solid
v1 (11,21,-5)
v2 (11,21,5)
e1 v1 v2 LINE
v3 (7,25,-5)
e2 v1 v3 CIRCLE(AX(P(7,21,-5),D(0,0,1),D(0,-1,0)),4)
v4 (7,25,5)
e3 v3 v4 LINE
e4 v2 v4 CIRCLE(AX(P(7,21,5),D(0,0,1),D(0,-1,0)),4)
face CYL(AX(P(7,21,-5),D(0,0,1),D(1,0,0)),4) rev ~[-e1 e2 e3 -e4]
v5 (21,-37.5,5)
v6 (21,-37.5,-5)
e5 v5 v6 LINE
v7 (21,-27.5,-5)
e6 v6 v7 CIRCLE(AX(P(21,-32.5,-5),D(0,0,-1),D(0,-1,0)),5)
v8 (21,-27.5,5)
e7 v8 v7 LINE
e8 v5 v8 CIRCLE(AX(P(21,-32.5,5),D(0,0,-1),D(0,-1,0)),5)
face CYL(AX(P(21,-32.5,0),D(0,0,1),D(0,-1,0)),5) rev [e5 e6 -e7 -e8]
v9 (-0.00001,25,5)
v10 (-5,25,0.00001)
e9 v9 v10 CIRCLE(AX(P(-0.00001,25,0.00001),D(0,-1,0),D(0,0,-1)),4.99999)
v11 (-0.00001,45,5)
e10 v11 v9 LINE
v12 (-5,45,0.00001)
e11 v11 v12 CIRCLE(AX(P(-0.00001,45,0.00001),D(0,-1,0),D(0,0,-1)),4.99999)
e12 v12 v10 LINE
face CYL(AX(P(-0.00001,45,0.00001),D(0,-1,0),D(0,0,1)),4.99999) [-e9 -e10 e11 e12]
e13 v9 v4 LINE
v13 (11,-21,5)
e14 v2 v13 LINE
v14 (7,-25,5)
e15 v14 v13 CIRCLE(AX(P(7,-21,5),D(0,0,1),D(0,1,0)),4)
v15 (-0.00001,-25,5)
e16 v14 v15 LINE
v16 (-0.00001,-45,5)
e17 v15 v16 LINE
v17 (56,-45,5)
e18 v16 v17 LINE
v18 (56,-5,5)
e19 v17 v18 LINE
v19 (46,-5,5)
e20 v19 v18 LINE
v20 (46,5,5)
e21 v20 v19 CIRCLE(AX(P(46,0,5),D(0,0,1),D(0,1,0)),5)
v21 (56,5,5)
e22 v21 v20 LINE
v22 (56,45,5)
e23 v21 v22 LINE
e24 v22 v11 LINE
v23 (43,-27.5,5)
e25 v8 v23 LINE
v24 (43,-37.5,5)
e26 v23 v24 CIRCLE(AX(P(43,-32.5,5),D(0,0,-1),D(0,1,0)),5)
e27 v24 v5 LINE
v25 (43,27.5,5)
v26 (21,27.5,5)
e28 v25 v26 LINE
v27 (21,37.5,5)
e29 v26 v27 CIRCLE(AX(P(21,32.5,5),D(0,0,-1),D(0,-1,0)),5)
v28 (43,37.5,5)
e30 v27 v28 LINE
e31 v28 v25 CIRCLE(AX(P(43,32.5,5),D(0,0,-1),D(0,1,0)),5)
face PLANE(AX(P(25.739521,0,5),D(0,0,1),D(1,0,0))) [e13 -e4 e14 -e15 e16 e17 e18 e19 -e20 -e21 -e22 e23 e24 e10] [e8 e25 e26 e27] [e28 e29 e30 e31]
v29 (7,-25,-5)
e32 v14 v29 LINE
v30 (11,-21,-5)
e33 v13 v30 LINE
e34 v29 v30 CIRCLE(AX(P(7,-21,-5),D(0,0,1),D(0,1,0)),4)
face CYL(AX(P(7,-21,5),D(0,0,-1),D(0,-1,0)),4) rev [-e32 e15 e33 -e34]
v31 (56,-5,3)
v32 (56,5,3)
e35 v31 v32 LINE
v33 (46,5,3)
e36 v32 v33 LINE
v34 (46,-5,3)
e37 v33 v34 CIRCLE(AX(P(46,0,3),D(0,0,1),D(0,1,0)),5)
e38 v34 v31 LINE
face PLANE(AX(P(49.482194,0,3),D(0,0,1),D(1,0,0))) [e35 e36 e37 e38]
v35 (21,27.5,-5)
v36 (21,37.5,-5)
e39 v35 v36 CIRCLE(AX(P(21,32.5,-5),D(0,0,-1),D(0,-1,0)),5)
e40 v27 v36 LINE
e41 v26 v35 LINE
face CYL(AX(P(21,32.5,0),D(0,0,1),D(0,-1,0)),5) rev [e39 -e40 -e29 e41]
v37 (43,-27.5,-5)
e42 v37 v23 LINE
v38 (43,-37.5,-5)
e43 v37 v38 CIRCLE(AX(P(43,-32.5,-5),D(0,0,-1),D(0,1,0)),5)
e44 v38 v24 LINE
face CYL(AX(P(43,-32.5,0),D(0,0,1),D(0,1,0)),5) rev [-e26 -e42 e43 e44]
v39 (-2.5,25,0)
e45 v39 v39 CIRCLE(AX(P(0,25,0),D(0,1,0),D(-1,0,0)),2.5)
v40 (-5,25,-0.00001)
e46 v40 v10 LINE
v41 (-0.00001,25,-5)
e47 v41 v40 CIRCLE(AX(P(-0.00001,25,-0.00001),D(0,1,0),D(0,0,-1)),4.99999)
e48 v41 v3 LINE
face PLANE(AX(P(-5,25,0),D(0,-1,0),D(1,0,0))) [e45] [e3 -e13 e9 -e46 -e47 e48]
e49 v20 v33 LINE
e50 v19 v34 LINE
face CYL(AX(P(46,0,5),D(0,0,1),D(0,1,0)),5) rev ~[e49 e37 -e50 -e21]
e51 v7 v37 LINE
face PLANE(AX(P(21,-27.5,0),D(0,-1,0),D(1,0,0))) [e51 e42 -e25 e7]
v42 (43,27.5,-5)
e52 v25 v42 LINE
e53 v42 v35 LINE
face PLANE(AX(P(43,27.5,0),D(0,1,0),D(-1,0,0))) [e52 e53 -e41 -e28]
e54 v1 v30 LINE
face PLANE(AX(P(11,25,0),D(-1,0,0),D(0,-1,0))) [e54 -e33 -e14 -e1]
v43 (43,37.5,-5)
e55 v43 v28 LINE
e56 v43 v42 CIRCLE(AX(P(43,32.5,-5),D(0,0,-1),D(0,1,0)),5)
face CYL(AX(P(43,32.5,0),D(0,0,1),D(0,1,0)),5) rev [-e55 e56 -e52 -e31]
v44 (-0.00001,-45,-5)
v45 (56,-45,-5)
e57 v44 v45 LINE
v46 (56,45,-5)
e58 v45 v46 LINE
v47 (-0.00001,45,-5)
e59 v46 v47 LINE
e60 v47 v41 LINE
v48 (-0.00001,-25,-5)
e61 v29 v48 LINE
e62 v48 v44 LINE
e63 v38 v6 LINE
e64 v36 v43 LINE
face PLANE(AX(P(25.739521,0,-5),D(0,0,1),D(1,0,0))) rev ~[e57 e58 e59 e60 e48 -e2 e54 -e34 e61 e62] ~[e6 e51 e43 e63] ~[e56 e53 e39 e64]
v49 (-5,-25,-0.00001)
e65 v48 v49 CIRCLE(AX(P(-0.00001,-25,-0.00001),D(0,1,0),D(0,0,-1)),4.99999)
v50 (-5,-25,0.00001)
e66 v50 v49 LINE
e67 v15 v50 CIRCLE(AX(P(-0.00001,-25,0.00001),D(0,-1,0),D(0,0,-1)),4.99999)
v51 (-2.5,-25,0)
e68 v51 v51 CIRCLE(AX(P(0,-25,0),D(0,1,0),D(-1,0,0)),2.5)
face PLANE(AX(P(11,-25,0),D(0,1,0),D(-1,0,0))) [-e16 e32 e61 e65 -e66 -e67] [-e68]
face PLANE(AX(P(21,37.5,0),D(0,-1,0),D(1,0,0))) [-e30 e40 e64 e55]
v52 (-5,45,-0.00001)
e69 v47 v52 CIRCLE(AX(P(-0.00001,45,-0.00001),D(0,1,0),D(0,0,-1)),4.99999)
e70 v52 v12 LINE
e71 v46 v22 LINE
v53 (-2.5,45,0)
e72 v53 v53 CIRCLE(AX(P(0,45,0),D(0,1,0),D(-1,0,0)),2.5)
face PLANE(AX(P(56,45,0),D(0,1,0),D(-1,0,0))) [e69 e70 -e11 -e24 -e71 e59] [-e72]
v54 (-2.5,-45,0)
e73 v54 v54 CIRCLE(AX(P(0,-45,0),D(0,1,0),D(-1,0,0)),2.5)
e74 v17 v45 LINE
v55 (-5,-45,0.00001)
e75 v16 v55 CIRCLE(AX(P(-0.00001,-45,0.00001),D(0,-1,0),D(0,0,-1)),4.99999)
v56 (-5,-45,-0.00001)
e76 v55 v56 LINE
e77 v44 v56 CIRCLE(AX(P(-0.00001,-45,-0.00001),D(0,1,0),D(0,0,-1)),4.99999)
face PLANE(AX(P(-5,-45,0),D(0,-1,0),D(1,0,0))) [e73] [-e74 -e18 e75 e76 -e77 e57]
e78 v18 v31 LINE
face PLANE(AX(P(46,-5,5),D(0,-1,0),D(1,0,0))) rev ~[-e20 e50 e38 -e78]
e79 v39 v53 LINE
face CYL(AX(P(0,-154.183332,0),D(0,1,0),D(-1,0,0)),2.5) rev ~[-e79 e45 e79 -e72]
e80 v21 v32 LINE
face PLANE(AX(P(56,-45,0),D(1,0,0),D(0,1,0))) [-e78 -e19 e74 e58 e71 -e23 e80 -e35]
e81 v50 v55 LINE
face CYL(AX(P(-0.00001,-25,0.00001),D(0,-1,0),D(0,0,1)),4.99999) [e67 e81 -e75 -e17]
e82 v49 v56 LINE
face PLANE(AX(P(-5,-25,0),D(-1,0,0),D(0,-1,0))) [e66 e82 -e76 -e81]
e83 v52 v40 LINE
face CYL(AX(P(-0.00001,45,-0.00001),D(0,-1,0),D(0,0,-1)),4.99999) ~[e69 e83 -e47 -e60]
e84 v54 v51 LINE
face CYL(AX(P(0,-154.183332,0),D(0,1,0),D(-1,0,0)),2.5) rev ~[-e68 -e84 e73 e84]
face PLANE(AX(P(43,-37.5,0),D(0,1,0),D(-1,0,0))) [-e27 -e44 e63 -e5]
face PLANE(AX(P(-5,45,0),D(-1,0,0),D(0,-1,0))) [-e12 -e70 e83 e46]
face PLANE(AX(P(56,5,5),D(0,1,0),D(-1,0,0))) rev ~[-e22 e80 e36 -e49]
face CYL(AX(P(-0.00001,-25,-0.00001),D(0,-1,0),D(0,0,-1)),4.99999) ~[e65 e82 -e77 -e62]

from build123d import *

# Parameters (mm, degrees)
F1_DEPTH = 5
F3_D     = 5
F4_R     = 4.99999
F5_R     = 4
F7_DEPTH = 2


# Not quite as in the source:
# - a fillet or chamfer is up to 0.001 mm smaller than in the source, because OpenCascade refuses the exact size
# - a feature names something its author has since deleted; it is built from what else it names


with BuildPart() as f1:
    # F0 (on Top) → F1 (new body, symmetric)
    with BuildSketch(Plane.XY):
        Polygon((13, -45), (56, -45), (56, 45), (13, 45), (-5, 45), (-5, 25), (11, 25), (11, -25), (-5, -25), (-5, -45), align=None)
        with BuildLine():
            ThreePointArc((43, -27.5), (48, -32.5), (43, -37.5))
            Line((43, -37.5), (21, -37.5))
            ThreePointArc((21, -37.5), (16, -32.5), (21, -27.5))
            Line((21, -27.5), (43, -27.5))
        make_face(mode=Mode.SUBTRACT)
        with BuildLine():
            ThreePointArc((43, 37.5), (48, 32.5), (43, 27.5))
            Line((43, 27.5), (21, 27.5))
            ThreePointArc((21, 27.5), (16, 32.5), (21, 37.5))
            Line((21, 37.5), (43, 37.5))
        make_face(mode=Mode.SUBTRACT)
    extrude(amount=F1_DEPTH, both=True)

    # F3 (through all)
    with Locations(Plane.XZ.offset(45)):
        with Locations((0, 0)):
            Hole(F3_D / 2)

    # F4 (radius 5 in the source; OpenCascade refuses exactly that, so slightly less here)
    f4_edges = [f1.edges().sort_by_distance(p)[0] for p in [
        (-5, -35, 5),
        (-5, -35, -5),
        (-5, 35, 5),
        (-5, 35, -5),
    ]]
    fillet(f4_edges, radius=F4_R)

    # F5
    f5_edges = [f1.edges().sort_by_distance(p)[0] for p in [
        (11, 25, 0),
        (11, -25, 0),
    ]]
    fillet(f5_edges, radius=F5_R)

    # F6 (on face) → F7 (cut)
    with BuildSketch(Plane.XY.offset(5)):
        with BuildLine():
            ThreePointArc((46, 5), (41, 0), (46, -5))
            Line((46, -5), (56, -5))
            Line((56, -5), (56, 5))
            Line((56, 5), (46, 5))
        make_face()
    extrude(amount=-F7_DEPTH, mode=Mode.SUBTRACT)


solid = f1.part
